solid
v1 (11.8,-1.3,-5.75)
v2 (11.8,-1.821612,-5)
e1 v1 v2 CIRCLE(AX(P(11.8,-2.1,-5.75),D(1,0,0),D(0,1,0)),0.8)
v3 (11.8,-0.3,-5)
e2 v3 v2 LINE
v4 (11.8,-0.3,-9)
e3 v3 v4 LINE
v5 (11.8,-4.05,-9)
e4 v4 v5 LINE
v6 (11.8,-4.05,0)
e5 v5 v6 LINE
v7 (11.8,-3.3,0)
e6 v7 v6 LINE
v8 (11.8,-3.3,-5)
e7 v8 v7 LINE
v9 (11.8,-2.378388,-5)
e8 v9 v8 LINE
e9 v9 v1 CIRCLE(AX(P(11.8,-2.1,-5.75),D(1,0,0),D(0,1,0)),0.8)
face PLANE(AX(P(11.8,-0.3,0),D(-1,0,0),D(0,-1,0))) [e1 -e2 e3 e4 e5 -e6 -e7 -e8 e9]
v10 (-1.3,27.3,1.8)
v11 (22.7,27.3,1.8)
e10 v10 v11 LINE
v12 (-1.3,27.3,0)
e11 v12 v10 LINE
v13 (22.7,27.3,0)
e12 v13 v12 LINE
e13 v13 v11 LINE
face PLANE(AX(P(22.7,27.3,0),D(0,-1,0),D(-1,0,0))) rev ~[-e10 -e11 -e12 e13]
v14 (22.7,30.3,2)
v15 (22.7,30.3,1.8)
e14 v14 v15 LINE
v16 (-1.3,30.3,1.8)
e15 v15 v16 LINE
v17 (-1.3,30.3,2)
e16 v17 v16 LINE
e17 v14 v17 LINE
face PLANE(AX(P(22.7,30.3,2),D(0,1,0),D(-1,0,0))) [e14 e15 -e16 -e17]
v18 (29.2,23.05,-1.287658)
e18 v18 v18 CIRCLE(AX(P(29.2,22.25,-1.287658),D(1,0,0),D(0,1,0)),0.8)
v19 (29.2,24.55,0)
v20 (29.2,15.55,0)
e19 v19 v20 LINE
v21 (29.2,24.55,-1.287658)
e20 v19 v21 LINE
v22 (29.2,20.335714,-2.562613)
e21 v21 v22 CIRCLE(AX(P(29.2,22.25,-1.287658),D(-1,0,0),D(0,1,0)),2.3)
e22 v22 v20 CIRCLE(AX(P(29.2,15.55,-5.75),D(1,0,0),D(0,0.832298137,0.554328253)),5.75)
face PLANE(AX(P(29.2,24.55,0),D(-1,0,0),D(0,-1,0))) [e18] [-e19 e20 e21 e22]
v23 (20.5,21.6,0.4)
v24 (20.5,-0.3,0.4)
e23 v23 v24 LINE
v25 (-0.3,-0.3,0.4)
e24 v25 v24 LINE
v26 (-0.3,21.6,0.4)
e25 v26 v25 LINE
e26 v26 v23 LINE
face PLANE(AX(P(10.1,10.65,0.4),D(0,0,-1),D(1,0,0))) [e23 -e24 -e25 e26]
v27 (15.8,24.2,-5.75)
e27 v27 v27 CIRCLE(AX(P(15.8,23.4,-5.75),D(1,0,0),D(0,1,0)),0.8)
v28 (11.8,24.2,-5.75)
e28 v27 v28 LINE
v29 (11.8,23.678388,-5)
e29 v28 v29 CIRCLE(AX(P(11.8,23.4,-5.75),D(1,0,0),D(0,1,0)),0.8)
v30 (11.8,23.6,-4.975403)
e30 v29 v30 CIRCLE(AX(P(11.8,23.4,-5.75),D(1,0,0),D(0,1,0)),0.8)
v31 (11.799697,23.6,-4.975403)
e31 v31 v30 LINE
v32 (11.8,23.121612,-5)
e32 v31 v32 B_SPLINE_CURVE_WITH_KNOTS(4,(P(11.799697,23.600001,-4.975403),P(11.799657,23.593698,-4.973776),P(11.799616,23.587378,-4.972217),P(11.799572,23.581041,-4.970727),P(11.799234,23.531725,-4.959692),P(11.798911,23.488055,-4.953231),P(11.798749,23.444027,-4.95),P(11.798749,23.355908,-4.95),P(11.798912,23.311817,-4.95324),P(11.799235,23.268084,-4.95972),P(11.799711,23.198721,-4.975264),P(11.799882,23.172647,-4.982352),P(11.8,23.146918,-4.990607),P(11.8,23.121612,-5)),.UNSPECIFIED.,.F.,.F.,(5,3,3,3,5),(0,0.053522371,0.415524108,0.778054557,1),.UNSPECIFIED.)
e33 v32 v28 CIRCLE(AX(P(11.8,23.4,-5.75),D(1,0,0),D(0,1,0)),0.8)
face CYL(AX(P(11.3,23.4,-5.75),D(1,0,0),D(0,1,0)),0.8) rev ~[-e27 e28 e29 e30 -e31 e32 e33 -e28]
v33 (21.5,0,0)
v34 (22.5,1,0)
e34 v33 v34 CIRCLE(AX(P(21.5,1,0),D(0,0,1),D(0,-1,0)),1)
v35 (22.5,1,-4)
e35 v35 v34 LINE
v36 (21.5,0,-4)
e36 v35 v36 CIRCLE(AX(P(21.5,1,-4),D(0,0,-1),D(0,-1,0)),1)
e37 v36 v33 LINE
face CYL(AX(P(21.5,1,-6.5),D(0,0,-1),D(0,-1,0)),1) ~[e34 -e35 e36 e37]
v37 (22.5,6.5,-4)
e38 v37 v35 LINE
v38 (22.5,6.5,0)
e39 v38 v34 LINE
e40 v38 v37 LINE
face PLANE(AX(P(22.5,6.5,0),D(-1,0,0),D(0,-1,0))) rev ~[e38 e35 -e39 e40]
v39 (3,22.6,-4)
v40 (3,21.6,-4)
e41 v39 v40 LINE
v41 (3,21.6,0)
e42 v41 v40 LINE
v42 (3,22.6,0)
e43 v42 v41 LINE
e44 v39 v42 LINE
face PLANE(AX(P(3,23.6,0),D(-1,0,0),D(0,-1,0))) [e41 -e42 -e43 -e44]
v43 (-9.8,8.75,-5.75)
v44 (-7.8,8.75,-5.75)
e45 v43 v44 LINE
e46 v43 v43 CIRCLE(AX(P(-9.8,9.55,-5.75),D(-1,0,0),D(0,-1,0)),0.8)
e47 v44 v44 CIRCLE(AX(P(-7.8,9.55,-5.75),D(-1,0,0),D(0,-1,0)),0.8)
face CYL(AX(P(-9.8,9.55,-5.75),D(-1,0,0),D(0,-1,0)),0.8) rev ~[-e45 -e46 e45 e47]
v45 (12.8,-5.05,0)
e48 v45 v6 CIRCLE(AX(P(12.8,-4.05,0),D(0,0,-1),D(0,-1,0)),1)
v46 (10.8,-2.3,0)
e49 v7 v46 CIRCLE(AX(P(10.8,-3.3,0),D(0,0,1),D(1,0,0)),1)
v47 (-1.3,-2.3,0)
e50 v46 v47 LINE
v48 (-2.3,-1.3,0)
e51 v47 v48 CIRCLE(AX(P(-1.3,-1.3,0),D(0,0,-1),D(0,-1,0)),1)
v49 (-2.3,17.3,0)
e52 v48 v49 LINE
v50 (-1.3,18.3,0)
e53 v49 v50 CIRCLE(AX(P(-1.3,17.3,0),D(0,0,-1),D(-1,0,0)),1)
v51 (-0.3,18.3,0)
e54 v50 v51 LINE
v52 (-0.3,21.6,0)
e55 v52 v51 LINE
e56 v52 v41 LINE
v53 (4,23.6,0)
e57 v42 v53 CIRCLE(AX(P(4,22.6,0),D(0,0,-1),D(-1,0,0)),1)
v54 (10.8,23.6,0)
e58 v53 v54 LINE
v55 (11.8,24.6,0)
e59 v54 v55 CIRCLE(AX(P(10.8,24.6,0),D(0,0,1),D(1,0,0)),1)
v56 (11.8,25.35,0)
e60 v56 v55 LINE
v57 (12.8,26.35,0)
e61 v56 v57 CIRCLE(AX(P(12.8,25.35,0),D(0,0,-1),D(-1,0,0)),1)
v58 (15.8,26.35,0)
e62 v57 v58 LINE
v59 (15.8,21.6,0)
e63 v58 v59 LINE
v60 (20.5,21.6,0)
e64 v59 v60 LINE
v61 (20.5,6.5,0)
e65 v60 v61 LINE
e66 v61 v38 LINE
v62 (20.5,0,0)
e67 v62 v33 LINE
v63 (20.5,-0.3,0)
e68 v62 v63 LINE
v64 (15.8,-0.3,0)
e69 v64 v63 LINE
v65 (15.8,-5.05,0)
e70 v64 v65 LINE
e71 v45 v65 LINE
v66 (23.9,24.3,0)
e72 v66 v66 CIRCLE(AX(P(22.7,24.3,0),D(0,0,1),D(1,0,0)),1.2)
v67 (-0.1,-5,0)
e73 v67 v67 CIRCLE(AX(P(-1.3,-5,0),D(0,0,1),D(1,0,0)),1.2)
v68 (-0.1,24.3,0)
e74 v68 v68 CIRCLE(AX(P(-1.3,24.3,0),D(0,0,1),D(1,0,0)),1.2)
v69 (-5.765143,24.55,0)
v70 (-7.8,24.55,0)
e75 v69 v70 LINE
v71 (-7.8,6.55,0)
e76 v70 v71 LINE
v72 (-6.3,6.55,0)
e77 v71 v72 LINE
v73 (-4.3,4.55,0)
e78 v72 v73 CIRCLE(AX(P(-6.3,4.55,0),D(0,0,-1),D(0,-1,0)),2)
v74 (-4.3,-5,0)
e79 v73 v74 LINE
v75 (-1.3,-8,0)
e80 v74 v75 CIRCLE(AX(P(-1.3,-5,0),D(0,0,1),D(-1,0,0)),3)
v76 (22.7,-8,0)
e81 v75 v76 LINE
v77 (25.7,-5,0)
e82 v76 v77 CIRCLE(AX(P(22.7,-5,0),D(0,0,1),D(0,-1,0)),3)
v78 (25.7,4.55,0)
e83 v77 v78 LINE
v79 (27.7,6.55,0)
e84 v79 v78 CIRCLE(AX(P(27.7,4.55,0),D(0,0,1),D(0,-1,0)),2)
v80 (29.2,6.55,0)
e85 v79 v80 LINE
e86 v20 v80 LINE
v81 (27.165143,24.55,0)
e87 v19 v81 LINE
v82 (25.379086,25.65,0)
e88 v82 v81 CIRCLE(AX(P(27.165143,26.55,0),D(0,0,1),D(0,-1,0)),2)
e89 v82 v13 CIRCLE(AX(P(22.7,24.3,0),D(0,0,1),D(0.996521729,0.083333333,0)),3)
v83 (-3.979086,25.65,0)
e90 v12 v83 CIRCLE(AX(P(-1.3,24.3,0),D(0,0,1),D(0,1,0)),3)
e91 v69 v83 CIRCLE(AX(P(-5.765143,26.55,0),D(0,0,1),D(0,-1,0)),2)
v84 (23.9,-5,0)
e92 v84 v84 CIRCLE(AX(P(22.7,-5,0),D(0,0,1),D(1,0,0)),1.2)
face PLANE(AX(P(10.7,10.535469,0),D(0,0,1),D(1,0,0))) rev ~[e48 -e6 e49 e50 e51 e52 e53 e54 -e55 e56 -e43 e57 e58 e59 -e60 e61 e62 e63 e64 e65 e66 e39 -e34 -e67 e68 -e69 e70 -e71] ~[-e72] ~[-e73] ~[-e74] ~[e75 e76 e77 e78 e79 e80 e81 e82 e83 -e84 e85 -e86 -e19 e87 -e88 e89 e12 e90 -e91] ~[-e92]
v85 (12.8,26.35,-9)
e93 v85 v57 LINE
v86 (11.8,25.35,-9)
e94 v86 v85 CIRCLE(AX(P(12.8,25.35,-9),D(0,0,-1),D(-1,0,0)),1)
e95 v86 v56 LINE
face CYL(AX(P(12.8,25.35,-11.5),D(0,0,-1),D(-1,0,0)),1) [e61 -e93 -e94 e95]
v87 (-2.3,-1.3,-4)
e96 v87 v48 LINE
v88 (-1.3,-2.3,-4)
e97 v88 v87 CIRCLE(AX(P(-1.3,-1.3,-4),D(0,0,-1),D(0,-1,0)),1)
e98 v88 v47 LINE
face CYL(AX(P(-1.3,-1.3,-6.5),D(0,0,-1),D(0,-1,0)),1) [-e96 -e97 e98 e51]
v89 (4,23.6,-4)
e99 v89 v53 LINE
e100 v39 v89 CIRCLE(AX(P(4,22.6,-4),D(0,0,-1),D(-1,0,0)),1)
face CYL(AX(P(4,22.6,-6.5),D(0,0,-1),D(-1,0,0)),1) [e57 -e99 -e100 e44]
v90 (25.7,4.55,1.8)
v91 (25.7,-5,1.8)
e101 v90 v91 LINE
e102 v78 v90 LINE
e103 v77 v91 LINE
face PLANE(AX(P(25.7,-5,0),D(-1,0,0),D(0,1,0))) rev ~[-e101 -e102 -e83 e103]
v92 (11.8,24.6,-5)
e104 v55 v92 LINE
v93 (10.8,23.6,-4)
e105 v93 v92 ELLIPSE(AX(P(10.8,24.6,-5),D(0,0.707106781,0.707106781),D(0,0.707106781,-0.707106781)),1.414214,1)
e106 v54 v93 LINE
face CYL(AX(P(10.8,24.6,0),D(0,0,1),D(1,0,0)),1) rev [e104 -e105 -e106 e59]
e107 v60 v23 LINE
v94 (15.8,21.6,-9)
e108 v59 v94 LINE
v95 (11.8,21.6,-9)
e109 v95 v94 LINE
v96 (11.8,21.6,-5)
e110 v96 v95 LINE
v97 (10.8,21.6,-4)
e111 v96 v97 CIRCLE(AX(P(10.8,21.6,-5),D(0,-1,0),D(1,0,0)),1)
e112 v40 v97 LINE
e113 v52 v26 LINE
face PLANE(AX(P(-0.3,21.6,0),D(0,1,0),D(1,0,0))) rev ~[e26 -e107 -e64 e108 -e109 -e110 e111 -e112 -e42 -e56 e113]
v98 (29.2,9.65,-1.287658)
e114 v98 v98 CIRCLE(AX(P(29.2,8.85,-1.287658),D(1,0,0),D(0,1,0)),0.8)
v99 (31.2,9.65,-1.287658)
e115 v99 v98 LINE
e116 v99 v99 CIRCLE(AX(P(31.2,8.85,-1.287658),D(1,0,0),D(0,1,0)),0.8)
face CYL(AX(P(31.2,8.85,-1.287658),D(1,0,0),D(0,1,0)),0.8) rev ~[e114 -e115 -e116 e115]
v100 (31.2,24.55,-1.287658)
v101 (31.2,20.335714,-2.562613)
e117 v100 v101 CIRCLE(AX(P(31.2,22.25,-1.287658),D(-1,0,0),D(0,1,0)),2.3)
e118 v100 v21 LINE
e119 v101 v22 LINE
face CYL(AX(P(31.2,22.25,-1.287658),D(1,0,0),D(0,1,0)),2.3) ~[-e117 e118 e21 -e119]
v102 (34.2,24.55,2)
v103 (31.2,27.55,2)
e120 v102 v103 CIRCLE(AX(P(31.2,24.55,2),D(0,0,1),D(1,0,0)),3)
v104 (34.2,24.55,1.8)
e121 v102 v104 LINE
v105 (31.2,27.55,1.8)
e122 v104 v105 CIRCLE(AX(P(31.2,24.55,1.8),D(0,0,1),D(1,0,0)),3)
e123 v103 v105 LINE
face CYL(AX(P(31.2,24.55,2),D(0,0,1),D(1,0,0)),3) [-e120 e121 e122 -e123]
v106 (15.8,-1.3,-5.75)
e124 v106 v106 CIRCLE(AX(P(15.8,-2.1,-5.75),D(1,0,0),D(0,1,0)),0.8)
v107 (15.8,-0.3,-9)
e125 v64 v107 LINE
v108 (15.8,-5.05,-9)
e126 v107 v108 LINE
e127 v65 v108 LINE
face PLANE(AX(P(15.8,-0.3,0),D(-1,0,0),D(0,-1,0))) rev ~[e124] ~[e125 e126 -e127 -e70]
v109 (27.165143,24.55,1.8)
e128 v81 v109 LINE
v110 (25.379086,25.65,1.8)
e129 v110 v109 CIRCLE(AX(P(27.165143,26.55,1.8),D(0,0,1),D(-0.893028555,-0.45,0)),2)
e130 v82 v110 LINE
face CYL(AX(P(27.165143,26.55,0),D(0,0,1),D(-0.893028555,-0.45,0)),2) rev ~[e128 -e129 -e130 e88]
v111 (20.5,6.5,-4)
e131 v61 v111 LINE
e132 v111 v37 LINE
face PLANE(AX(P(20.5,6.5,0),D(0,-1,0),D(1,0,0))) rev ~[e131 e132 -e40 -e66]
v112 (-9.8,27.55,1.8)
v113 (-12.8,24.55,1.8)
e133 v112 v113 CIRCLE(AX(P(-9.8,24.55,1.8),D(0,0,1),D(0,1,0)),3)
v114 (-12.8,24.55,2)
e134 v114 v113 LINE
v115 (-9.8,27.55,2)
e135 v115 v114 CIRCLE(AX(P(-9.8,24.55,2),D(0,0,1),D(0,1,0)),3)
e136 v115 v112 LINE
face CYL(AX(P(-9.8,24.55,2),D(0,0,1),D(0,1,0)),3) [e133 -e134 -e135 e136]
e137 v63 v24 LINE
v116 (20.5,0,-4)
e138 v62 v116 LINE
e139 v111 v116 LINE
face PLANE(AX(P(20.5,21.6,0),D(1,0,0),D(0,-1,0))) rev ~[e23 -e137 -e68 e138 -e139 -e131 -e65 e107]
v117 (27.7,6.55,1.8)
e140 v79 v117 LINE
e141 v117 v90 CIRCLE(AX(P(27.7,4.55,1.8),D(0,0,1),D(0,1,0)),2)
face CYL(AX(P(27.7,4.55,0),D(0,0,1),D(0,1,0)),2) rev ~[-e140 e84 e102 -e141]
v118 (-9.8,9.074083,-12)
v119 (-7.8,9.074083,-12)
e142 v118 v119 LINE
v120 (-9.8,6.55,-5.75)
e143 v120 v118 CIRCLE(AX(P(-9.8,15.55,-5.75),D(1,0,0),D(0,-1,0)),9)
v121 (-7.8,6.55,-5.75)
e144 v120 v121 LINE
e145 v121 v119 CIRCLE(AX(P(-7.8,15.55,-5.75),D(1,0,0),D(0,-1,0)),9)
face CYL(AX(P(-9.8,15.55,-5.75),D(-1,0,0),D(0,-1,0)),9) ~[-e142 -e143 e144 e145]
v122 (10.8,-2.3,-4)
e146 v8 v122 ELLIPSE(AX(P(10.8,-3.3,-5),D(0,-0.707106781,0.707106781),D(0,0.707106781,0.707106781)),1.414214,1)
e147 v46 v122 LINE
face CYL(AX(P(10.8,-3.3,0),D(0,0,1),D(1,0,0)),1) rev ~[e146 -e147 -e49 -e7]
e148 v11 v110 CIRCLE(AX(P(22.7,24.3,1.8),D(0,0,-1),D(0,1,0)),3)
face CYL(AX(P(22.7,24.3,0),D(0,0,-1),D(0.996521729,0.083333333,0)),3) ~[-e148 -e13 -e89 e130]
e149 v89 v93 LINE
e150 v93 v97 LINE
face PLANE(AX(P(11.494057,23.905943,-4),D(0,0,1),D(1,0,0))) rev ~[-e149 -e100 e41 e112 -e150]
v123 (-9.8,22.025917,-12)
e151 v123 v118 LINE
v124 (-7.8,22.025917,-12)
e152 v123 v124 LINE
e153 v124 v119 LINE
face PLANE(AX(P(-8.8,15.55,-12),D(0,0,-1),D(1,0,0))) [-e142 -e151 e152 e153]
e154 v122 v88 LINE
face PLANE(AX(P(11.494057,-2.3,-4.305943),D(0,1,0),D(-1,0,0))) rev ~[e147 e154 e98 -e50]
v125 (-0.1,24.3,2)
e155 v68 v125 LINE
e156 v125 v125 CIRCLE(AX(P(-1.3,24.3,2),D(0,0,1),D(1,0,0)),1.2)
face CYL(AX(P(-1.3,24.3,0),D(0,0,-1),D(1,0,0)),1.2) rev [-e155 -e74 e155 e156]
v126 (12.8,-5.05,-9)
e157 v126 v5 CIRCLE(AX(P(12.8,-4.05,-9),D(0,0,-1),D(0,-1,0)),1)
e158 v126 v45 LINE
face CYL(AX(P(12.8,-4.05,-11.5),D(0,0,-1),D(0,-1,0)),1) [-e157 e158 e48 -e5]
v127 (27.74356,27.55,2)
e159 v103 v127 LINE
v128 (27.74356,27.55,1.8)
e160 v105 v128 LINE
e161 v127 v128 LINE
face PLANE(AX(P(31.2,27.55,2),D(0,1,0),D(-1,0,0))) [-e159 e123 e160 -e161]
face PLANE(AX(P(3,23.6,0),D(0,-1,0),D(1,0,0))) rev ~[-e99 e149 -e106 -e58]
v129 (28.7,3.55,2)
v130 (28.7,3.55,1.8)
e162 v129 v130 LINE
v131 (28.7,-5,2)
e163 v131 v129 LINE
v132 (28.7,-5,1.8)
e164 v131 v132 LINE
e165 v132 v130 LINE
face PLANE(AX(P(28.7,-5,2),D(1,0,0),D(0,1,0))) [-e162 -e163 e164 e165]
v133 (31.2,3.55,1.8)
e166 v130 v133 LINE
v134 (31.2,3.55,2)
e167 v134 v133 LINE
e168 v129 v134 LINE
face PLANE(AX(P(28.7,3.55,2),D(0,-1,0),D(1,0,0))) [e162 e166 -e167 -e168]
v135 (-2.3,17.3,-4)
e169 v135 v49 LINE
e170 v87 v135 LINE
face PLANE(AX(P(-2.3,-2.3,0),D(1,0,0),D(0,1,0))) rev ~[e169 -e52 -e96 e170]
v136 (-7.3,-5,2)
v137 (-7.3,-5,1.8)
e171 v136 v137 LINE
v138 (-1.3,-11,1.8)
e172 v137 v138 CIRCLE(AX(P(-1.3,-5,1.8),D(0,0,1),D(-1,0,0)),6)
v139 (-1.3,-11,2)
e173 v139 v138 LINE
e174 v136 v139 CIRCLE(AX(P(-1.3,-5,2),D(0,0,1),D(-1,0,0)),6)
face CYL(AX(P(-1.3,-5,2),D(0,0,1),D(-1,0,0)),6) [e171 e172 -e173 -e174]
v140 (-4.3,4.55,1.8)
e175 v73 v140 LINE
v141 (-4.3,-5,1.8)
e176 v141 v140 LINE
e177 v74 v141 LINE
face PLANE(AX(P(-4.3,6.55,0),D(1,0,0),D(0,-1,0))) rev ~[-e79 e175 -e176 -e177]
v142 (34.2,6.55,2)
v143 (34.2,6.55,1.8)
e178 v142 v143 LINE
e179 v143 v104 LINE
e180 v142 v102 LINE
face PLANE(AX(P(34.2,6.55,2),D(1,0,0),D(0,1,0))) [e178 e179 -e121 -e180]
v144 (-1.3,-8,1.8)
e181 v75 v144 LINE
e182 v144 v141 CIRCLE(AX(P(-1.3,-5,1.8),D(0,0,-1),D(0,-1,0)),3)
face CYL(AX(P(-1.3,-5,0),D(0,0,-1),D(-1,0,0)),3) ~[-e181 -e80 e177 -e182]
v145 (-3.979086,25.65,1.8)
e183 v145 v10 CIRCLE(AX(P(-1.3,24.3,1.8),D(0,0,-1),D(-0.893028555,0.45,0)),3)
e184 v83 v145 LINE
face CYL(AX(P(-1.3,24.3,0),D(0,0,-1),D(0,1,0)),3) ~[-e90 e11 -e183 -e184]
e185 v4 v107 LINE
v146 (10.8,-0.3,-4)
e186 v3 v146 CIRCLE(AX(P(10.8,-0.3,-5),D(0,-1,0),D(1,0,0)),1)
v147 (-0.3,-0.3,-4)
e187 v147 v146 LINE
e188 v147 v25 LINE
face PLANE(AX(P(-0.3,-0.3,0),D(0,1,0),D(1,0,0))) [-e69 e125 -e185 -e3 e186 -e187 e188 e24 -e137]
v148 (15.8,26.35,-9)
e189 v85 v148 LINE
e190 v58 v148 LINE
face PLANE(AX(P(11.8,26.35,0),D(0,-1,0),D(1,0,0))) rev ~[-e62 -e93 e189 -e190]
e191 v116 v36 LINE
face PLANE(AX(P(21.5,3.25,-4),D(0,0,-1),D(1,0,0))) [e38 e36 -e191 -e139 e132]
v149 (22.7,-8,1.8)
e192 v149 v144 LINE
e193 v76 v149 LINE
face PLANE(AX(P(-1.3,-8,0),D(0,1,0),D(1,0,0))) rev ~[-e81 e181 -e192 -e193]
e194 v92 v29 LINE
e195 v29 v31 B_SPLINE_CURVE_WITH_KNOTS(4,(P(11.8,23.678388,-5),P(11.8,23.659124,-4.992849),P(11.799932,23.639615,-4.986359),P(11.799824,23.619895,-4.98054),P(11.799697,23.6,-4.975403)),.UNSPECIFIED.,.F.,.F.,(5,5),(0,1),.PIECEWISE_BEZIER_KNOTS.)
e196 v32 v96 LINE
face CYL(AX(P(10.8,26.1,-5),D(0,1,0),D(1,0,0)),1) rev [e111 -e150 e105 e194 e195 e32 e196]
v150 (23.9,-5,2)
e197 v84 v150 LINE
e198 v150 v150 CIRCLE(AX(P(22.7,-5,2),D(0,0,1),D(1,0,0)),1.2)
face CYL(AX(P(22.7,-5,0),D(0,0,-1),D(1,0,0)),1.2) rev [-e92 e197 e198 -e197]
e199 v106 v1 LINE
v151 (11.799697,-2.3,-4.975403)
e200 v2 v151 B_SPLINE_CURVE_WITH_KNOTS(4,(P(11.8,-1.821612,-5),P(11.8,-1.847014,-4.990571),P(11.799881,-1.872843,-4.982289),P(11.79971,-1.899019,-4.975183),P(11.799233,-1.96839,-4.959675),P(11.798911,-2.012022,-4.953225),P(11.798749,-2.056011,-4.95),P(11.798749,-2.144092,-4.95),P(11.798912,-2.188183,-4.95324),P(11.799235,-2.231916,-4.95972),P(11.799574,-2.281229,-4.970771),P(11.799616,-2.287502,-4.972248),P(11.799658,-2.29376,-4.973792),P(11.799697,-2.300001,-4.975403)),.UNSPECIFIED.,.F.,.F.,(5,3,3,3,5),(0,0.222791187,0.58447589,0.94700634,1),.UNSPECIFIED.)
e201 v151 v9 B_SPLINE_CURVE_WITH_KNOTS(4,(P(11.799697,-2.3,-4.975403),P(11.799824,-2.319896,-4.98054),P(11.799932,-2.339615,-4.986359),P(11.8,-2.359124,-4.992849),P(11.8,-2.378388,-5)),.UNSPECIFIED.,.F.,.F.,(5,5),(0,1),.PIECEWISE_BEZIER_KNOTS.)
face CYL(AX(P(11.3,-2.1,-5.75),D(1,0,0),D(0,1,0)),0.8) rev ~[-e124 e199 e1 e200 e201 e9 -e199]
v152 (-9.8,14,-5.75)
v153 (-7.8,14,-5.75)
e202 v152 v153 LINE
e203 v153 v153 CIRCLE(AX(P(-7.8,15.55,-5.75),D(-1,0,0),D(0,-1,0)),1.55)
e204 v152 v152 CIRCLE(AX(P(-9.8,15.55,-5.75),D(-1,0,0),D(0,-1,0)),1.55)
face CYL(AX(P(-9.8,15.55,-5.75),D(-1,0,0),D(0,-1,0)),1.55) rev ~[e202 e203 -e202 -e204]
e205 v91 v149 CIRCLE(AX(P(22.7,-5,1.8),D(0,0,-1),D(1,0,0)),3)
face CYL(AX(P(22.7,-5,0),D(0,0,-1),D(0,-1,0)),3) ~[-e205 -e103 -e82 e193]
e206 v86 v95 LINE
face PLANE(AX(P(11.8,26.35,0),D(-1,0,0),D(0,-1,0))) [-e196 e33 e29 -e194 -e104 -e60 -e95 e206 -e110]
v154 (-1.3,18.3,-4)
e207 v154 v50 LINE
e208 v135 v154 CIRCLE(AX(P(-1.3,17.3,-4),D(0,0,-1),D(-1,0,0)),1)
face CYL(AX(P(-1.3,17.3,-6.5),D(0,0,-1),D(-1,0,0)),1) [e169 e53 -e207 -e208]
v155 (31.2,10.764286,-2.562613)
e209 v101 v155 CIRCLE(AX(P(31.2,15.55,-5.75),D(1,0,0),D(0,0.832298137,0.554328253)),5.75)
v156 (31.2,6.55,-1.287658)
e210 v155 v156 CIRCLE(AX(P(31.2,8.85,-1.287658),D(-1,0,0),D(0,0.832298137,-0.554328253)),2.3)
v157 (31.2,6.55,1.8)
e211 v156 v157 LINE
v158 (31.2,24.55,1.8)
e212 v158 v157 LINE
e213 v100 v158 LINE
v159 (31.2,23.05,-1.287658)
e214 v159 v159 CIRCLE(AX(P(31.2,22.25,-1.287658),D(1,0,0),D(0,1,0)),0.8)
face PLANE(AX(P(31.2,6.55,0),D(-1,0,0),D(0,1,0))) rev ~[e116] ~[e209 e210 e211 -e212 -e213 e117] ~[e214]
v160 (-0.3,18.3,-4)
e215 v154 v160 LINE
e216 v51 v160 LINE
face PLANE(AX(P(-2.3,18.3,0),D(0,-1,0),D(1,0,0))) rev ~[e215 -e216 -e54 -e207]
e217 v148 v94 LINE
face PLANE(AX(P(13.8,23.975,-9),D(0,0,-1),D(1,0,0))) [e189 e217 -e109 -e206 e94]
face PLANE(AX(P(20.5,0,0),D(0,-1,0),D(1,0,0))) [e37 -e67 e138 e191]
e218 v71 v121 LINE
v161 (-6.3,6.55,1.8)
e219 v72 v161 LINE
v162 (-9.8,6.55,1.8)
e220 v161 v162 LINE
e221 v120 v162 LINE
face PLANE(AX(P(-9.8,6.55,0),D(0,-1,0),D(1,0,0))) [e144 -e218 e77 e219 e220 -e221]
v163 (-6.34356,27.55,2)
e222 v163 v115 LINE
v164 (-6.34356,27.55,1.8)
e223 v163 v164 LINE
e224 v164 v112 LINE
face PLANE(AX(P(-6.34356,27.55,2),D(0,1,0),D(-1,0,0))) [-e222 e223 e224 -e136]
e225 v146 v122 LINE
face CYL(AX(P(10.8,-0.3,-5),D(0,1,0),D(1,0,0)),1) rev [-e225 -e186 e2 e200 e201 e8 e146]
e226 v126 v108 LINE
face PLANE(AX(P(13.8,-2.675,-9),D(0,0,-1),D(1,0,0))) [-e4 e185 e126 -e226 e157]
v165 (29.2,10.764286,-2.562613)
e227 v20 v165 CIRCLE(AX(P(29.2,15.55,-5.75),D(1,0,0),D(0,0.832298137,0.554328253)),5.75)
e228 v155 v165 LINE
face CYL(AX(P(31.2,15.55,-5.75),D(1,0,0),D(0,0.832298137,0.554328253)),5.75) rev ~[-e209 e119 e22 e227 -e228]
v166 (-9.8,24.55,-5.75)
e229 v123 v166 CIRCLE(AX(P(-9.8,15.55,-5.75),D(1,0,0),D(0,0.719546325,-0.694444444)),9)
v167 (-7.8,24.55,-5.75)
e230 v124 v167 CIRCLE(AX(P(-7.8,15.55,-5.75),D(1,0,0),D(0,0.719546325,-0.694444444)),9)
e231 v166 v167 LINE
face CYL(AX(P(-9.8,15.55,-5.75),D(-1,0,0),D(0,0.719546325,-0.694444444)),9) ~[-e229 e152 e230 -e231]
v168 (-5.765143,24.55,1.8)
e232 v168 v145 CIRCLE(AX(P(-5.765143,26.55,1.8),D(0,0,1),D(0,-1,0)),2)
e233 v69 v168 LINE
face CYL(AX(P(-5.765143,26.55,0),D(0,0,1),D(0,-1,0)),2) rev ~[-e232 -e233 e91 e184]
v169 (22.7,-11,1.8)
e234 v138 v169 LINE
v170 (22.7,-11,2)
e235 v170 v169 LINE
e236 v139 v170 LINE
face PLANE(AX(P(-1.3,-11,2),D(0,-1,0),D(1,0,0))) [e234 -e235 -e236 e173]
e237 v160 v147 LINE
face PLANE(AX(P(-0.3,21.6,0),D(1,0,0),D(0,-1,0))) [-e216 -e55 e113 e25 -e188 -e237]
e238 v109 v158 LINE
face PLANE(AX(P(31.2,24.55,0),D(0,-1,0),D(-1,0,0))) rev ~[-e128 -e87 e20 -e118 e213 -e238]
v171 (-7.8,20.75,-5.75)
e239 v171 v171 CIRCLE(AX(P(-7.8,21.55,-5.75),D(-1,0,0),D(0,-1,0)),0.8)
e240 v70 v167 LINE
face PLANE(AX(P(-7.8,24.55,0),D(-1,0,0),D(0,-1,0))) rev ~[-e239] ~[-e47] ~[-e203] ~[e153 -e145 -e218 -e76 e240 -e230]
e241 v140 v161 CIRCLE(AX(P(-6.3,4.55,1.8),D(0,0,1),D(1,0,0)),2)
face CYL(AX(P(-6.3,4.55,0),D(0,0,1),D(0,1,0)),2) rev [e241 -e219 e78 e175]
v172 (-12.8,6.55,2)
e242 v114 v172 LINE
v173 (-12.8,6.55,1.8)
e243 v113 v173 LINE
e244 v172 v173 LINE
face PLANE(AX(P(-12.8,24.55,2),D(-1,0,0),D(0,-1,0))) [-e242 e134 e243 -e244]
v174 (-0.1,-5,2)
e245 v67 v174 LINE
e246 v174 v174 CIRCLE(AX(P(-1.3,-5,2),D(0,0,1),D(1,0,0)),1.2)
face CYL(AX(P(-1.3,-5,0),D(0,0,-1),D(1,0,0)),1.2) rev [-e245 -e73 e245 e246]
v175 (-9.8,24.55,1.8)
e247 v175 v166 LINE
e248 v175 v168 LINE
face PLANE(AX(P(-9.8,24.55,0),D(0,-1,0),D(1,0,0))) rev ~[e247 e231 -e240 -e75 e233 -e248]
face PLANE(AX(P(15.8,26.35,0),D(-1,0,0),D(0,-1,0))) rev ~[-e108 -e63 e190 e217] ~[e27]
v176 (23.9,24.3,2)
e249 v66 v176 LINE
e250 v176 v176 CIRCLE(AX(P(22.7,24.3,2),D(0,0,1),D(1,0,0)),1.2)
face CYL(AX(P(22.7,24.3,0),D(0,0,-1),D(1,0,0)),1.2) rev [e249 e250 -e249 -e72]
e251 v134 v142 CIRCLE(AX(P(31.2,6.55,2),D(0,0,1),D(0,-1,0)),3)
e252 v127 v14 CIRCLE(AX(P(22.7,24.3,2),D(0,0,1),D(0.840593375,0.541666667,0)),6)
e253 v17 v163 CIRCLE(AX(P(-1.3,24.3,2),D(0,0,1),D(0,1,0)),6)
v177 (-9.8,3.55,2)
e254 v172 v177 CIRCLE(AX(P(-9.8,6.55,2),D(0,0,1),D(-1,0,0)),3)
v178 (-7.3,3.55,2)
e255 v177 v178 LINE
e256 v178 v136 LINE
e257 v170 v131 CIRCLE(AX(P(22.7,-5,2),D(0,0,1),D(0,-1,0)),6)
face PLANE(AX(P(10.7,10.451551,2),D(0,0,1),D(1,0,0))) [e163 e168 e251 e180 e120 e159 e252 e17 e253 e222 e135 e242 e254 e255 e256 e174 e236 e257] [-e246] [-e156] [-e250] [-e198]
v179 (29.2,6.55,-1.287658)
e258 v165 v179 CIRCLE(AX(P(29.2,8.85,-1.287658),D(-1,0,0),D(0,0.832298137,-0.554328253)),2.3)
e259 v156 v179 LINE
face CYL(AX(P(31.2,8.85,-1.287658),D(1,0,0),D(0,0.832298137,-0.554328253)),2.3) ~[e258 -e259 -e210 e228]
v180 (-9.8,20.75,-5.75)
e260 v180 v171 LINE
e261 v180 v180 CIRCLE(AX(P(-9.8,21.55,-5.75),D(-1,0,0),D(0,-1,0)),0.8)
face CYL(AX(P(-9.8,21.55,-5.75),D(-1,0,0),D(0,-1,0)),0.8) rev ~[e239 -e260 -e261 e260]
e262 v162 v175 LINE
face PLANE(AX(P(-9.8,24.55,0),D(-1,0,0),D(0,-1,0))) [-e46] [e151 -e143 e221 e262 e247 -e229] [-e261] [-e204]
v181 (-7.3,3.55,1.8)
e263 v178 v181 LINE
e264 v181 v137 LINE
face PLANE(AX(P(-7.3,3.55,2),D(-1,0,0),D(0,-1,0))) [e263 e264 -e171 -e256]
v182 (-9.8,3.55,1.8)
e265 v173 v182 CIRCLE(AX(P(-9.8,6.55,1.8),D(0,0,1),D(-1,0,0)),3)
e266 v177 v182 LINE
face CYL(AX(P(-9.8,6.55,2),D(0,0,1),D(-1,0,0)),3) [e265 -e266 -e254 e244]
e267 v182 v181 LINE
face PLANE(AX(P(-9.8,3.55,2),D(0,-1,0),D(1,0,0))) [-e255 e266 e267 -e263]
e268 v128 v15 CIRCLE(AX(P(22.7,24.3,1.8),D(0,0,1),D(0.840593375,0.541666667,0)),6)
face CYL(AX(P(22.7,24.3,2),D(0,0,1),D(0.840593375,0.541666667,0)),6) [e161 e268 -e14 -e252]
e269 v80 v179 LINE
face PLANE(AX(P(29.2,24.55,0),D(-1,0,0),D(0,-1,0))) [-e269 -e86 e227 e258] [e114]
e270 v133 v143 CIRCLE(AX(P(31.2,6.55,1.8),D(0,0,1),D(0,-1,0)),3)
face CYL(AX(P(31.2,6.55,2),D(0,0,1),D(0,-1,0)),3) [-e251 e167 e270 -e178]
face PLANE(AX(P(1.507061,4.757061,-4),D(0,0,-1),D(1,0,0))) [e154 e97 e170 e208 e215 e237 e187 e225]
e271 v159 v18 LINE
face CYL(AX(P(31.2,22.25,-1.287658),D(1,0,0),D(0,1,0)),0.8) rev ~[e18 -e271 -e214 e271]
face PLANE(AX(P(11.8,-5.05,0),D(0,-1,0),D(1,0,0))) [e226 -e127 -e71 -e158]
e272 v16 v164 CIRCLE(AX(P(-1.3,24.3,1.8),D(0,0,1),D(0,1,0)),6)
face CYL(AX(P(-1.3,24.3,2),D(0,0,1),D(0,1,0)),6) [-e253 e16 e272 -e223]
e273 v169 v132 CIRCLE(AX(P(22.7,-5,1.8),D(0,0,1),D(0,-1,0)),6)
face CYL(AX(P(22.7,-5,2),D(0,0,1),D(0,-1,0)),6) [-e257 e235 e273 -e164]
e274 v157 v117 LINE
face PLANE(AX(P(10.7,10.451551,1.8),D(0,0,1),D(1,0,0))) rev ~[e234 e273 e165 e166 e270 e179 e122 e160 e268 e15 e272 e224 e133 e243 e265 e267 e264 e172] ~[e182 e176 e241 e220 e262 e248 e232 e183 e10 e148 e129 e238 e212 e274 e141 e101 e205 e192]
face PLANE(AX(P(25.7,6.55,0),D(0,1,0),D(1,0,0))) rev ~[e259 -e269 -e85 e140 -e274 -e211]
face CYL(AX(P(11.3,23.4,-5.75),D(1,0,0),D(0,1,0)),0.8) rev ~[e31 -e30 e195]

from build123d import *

# Parameters (mm, degrees)
F1_R          = 1.2
F2_DEPTH      = 2
F3_R          = 2
F4_W          = 4
F4_H          = 4.75
F5_DEPTH      = 9
F6_W          = 8.8
F6_H          = 2
F6_W_2        = 2
F6_H_2        = 6.5
F7_DEPTH      = 4
F8_R          = 0.8
F9_DEPTH      = 4
F10_T4_DEPTH  = 2
F10_S5_R      = 0.8
F10_T6_DEPTH  = 3
F10_T10_DEPTH = 6.5
F10_T15_DEPTH = 6.5
F10_T20_DEPTH = 2
F10_S21_R     = 0.8
F10_T22_DEPTH = 3
F10_T27_DEPTH = 6.5
F10_S29_R     = 0.8
F10_T30_DEPTH = 5
F10_T33_DEPTH = 4.5
F10_T40_DEPTH = 4.5
F10_T44_DEPTH = 6.5
F10_S46_R     = 0.8
F10_T47_DEPTH = 5
F10_T49_DEPTH = 6.5
F10_T51_DEPTH = 11.5
F11_W         = 2
F11_H         = 18
F12_DEPTH     = 12
F13_R         = 1.55
F13_R_2       = 0.8
F14_DEPTH     = 2
F15_R         = 0.8
F16_DEPTH     = 2
F19_DEPTH     = 0.2
F20_W         = 20.8
F20_H         = 21.9
F21_DEPTH     = 0.4


# Not quite as in the source:
# - a fillet or chamfer that OpenCascade refuses, or shapes differently, is made with other operations: its cross-section is extruded or revolved along the edge and cut away or added
# - two fillets or chamfers of one size are made in one step


with BuildPart() as f2:
    # F1 (on Top) → F2 (new body)
    with BuildSketch(Plane.XY):
        with BuildLine():
            Line((-4.2895651858, 24.55), (-9.8, 24.55))
            Line((-9.8, 24.55), (-9.8, 6.55))
            Line((-9.8, 6.55), (-4.3, 6.55))
            Line((-4.3, 6.55), (-4.3, -5))
            ThreePointArc((-4.3, -5), (-3.4213203436, -7.1213203436), (-1.3, -8))
            Line((-1.3, -8), (22.7, -8))
            ThreePointArc((22.7, -8), (24.8213203436, -7.1213203436), (25.7, -5))
            Line((25.7, -5), (25.7, 6.55))
            Line((25.7, 6.55), (31.2, 6.55))
            Line((31.2, 6.55), (31.2, 24.55))
            Line((31.2, 24.55), (25.6895651858, 24.55))
            ThreePointArc((25.6895651858, 24.55), (24.7310096012, 26.5079402166), (22.7, 27.3))
            Line((22.7, 27.3), (-1.3, 27.3))
            ThreePointArc((-1.3, 27.3), (-3.3310096012, 26.5079402166), (-4.2895651858, 24.55))
        make_face()
        with Locations((-1.3, -5)):
            Circle(F1_R, mode=Mode.SUBTRACT)
        with Locations((22.7, -5)):
            Circle(F1_R, mode=Mode.SUBTRACT)
        with Locations((-1.3, 24.3)):
            Circle(F1_R, mode=Mode.SUBTRACT)
        with Locations((22.7, 24.3)):
            Circle(F1_R, mode=Mode.SUBTRACT)
    extrude(amount=F2_DEPTH)

    # F3
    f3_edges = [f2.edges().sort_by_distance(p)[0] for p in [
        (-4.289565, 24.55, 1),
        (-4.3, 6.55, 1),
        (25.7, 6.55, 1),
        (25.689565, 24.55, 1),
    ]]
    fillet(f3_edges, radius=F3_R)

    # F4 (on face) → F5 (join)
    with BuildSketch(Plane(origin=(0, 0, 0), x_dir=(1, 0, 0), z_dir=(0, 0, -1))):
        with Locations((13.8, 2.675)):
            Rectangle(F4_W, F4_H)
        with Locations((13.8, -23.975)):
            Rectangle(F4_W, F4_H)
    extrude(amount=F5_DEPTH)

    # F6 (on face) → F7 (join)
    with BuildSketch(Plane(origin=(0, 0, 0), x_dir=(1, 0, 0), z_dir=(0, 0, -1))):
        Polygon((-2.3, -18.3), (-0.3, -18.3), (-0.3, 0.3), (11.8, 0.3), (11.8, 2.3), (-2.3, 2.3), align=None)
        with Locations((7.4, -22.6)):
            Rectangle(F6_W, F6_H)
        with Locations((21.5, -3.25)):
            Rectangle(F6_W_2, F6_H_2)
    extrude(amount=F7_DEPTH)

    # F8 (on face) → F9 (cut, through all)
    with BuildSketch(Plane.YZ.offset(15.8)):
        with Locations((23.4, -5.75)):
            Circle(F8_R)
        with Locations((-2.1, -5.75)):
            Circle(F8_R)
    extrude(amount=-F9_DEPTH, mode=Mode.SUBTRACT)

    # F10: fillet of radius 1 on 10 edges, made by hand


with BuildPart() as f10_tool2:
    # F10_s3 → F10_t4 (new body)
    with BuildSketch(Plane.XZ.offset(0.3)):
        with BuildLine():
            ThreePointArc((11.8, -5), (11.5071067812, -4.2928932188), (10.8, -4))
            Line((10.8, -4), (11.8, -4))
            Line((11.8, -4), (11.8, -5))
        make_face()
    extrude(amount=F10_T4_DEPTH)

    # F10_s5 → F10_t6 (cut, symmetric)
    with BuildSketch(Plane.YZ.offset(11.3)):
        with Locations((-2.1, -5.75)):
            Circle(F10_S5_R)
    extrude(amount=F10_T6_DEPTH, both=True, mode=Mode.SUBTRACT)


with BuildPart() as f2_1:
    add(f2.part)

    # F10_t1: union F10_tool2
    add(f10_tool2.part)


with BuildPart() as f10_tool8:
    # F10_s9 → F10_t10 (new body)
    with BuildSketch(Plane.XY.offset(2.5)):
        with BuildLine():
            ThreePointArc((11.8, -3.3), (11.5071067812, -2.5928932188), (10.8, -2.3))
            Line((10.8, -2.3), (11.8, -2.3))
            Line((11.8, -2.3), (11.8, -3.3))
        make_face()
    extrude(amount=-F10_T10_DEPTH)

    split(bisect_by=Plane.XY.offset(2), keep=Keep.BOTTOM)


with BuildPart() as f2_2:
    add(f2_1.part)

    # F10_t7: union F10_tool8
    add(f10_tool8.part)


with BuildPart() as f10_tool13:
    # F10_s14 → F10_t15 (new body)
    with BuildSketch(Plane.XY.offset(2.5)):
        with BuildLine():
            ThreePointArc((11.8, 24.6), (11.5071067812, 23.8928932188), (10.8, 23.6))
            Line((10.8, 23.6), (11.8, 23.6))
            Line((11.8, 23.6), (11.8, 24.6))
        make_face()
    extrude(amount=-F10_T15_DEPTH)

    split(bisect_by=Plane.XY.offset(2), keep=Keep.BOTTOM)


with BuildPart() as f2_3:
    add(f2_2.part)

    # F10_t12: union F10_tool13
    add(f10_tool13.part)


with BuildPart() as f10_tool18:
    # F10_s19 → F10_t20 (new body)
    with BuildSketch(Plane.XZ.offset(-23.6)):
        with BuildLine():
            ThreePointArc((11.8, -5), (11.5071067812, -4.2928932188), (10.8, -4))
            Line((10.8, -4), (11.8, -4))
            Line((11.8, -4), (11.8, -5))
        make_face()
    extrude(amount=F10_T20_DEPTH)

    # F10_s21 → F10_t22 (cut, symmetric)
    with BuildSketch(Plane.YZ.offset(11.3)):
        with Locations((23.4, -5.75)):
            Circle(F10_S21_R)
    extrude(amount=F10_T22_DEPTH, both=True, mode=Mode.SUBTRACT)


with BuildPart() as f2_4:
    add(f2_3.part)

    # F10_t17: union F10_tool18
    add(f10_tool18.part)


with BuildPart() as f10_tool25:
    # F10_s26 → F10_t27 (new body)
    with BuildSketch(Plane.XY):
        with BuildLine():
            ThreePointArc((11.8, -3.3), (11.5071067812, -2.5928932188), (10.8, -2.3))
            Line((10.8, -2.3), (11.8, -2.3))
            Line((11.8, -2.3), (11.8, -3.3))
        make_face()
    extrude(amount=-F10_T27_DEPTH)

    split(bisect_by=Plane.XY.offset(-4), keep=Keep.BOTTOM)

    # F10_s29 → F10_t30 (cut, symmetric)
    with BuildSketch(Plane.YZ.offset(11.3)):
        with Locations((-2.1, -5.75)):
            Circle(F10_S29_R)
    extrude(amount=F10_T30_DEPTH, both=True, mode=Mode.SUBTRACT)


with BuildPart() as f10_tool31:
    # F10_s32 → F10_t33 (new body)
    with BuildSketch(Plane.XZ.offset(0.3)):
        with BuildLine():
            ThreePointArc((11.8, -5), (11.5071067812, -4.2928932188), (10.8, -4))
            Line((10.8, -4), (11.8, -4))
            Line((11.8, -4), (11.8, -5))
        make_face()
    extrude(amount=F10_T33_DEPTH)

    split(bisect_by=Plane.XZ.offset(2.3), keep=Keep.TOP)


with BuildPart() as f10_tool25_1:
    add(f10_tool25.part)

    # F10_t35: intersect F10_tool31
    add(f10_tool31.part, mode=Mode.INTERSECT)


with BuildPart() as f2_5:
    add(f2_4.part)

    # F10_t23: union F10_tool25
    add(f10_tool25_1.part)


with BuildPart() as f10_tool38:
    # F10_s39 → F10_t40 (new body)
    with BuildSketch(Plane.XZ.offset(-26.1)):
        with BuildLine():
            ThreePointArc((11.8, -5), (11.5071067812, -4.2928932188), (10.8, -4))
            Line((10.8, -4), (11.8, -4))
            Line((11.8, -4), (11.8, -5))
        make_face()
    extrude(amount=F10_T40_DEPTH)

    split(bisect_by=Plane.XZ.offset(-23.6), keep=Keep.BOTTOM)


with BuildPart() as f10_tool42:
    # F10_s43 → F10_t44 (new body)
    with BuildSketch(Plane.XY):
        with BuildLine():
            ThreePointArc((11.8, 24.6), (11.5071067812, 23.8928932188), (10.8, 23.6))
            Line((10.8, 23.6), (11.8, 23.6))
            Line((11.8, 23.6), (11.8, 24.6))
        make_face()
    extrude(amount=-F10_T44_DEPTH)

    split(bisect_by=Plane.XY.offset(-4), keep=Keep.BOTTOM)

    # F10_s46 → F10_t47 (cut, symmetric)
    with BuildSketch(Plane.YZ.offset(11.3)):
        with Locations((23.4, -5.75)):
            Circle(F10_S46_R)
    extrude(amount=F10_T47_DEPTH, both=True, mode=Mode.SUBTRACT)


with BuildPart() as f10_tool38_1:
    add(f10_tool38.part)

    # F10_t48: intersect F10_tool42
    add(f10_tool42.part, mode=Mode.INTERSECT)


with BuildPart() as f2_6:
    add(f2_5.part)

    # F10_t36: union F10_tool38
    add(f10_tool38_1.part)

    # F10_s50 → F10_t49 (cut)
    with BuildSketch(Plane.XY.offset(-6.5)):
        with BuildLine():
            ThreePointArc((-1.3, -2.3), (-2.0071067812, -2.0071067812), (-2.3, -1.3))
            Line((-2.3, -1.3), (-2.3, -2.3))
            Line((-2.3, -2.3), (-1.3, -2.3))
        make_face()
        with BuildLine():
            ThreePointArc((-2.3, 17.3), (-2.0071067812, 18.0071067812), (-1.3, 18.3))
            Line((-1.3, 18.3), (-2.3, 18.3))
            Line((-2.3, 18.3), (-2.3, 17.3))
        make_face()
        with BuildLine():
            ThreePointArc((3, 22.6), (3.2928932188, 23.3071067812), (4, 23.6))
            Line((4, 23.6), (3, 23.6))
            Line((3, 23.6), (3, 22.6))
        make_face()
        with BuildLine():
            ThreePointArc((21.5, 0), (22.2071067812, 0.2928932188), (22.5, 1))
            Line((22.5, 1), (22.5, 0))
            Line((22.5, 0), (21.5, 0))
        make_face()
    extrude(amount=F10_T49_DEPTH, mode=Mode.SUBTRACT)

    # F10_s52 → F10_t51 (cut)
    with BuildSketch(Plane.XY.offset(-11.5)):
        with BuildLine():
            ThreePointArc((11.8, 25.35), (12.0928932188, 26.0571067812), (12.8, 26.35))
            Line((12.8, 26.35), (11.8, 26.35))
            Line((11.8, 26.35), (11.8, 25.35))
        make_face()
        with BuildLine():
            ThreePointArc((12.8, -5.05), (12.0928932188, -4.7571067812), (11.8, -4.05))
            Line((11.8, -4.05), (11.8, -5.05))
            Line((11.8, -5.05), (12.8, -5.05))
        make_face()
    extrude(amount=F10_T51_DEPTH, mode=Mode.SUBTRACT)

    # F11 (on face) → F12 (join)
    with BuildSketch(Plane(origin=(0, 0, 0), x_dir=(1, 0, 0), z_dir=(0, 0, -1))):
        with Locations((-8.8, -15.55)):
            Rectangle(F11_W, F11_H)
        with Locations((30.2, -15.55)):
            Rectangle(F11_W, F11_H)
    extrude(amount=F12_DEPTH)

    # F13 (on face) → F14 (cut, through all)
    with BuildSketch(Plane(origin=(-9.8, 0, 0), x_dir=(0, -1, 0), z_dir=(-1, 0, 0))):
        with Locations((-15.55, -5.75)):
            Circle(F13_R)
        with Locations((-21.55, -5.75)):
            Circle(F13_R_2)
        with Locations((-9.55, -5.75)):
            Circle(F13_R_2)
        with BuildLine():
            ThreePointArc((-22.0259169235, -12), (-23.8951558497, -9.1202186642), (-24.55, -5.75))
            Line((-24.55, -5.75), (-24.55, -12))
            Line((-24.55, -12), (-22.0259169235, -12))
        make_face()
        with BuildLine():
            ThreePointArc((-6.55, -5.75), (-7.2048441503, -9.1202186642), (-9.0740830765, -12))
            Line((-9.0740830765, -12), (-6.55, -12))
            Line((-6.55, -12), (-6.55, -5.75))
        make_face()
    extrude(amount=-F14_DEPTH, mode=Mode.SUBTRACT)

    # F15 (on face) → F16 (cut, through all)
    with BuildSketch(Plane.YZ.offset(31.2)):
        with BuildLine():
            ThreePointArc((24.55, -1.2876575658), (22.9160115829, -3.4891181199), (20.3357142857, -2.562612547))
            ThreePointArc((20.3357142857, -2.562612547), (15.55, 0), (10.7642857143, -2.562612547))
            ThreePointArc((10.7642857143, -2.562612547), (8.1839884171, -3.4891181199), (6.55, -1.2876575658))
            Line((6.55, -1.2876575658), (6.55, -12))
            Line((6.55, -12), (24.55, -12))
            Line((24.55, -12), (24.55, -1.2876575658))
        make_face()
        with Locations((8.85, -1.2876575658)):
            Circle(F15_R)
        with Locations((22.25, -1.2876575658)):
            Circle(F15_R)
    extrude(amount=-F16_DEPTH, mode=Mode.SUBTRACT)

    # F18 (on face) → F19 (join)
    with BuildSketch(Plane.XY.offset(2)):
        with BuildLine():
            ThreePointArc((-9.8, 27.55), (-11.9213203436, 26.6713203436), (-12.8, 24.55))
            Line((-12.8, 24.55), (-12.8, 6.55))
            ThreePointArc((-12.8, 6.55), (-11.9213203436, 4.4286796564), (-9.8, 3.55))
            Line((-9.8, 3.55), (-7.3, 3.55))
            Line((-7.3, 3.55), (-7.3, -5))
            ThreePointArc((-7.3, -5), (-5.5426406871, -9.2426406871), (-1.3, -11))
            Line((-1.3, -11), (22.7, -11))
            ThreePointArc((22.7, -11), (26.9426406871, -9.2426406871), (28.7, -5))
            Line((28.7, -5), (28.7, 3.55))
            Line((28.7, 3.55), (31.2, 3.55))
            ThreePointArc((31.2, 3.55), (33.3213203436, 4.4286796564), (34.2, 6.55))
            Line((34.2, 6.55), (34.2, 24.55))
            ThreePointArc((34.2, 24.55), (33.3213203436, 26.6713203436), (31.2, 27.55))
            Line((31.2, 27.55), (27.7435602505, 27.55))
            ThreePointArc((27.7435602505, 27.55), (25.5722813233, 29.5678268764), (22.7, 30.3))
            Line((22.7, 30.3), (-1.3, 30.3))
            ThreePointArc((-1.3, 30.3), (-4.1722813233, 29.5678268764), (-6.3435602505, 27.55))
            Line((-6.3435602505, 27.55), (-9.8, 27.55))
        make_face()
        with BuildLine():
            Line((-9.8, 6.55), (-9.8, 24.55))
            Line((-9.8, 24.55), (-5.7651427749, 24.55))
            ThreePointArc((-5.7651427749, 24.55), (-4.7163339267, 24.8470613634), (-3.9790856649, 25.65))
            ThreePointArc((-3.9790856649, 25.65), (-2.8732132723, 26.8544079549), (-1.3, 27.3))
            Line((-1.3, 27.3), (22.7, 27.3))
            ThreePointArc((22.7, 27.3), (24.2732132723, 26.8544079549), (25.3790856649, 25.65))
            ThreePointArc((25.3790856649, 25.65), (26.1163339267, 24.8470613634), (27.1651427749, 24.55))
            Line((27.1651427749, 24.55), (31.2, 24.55))
            Line((31.2, 24.55), (31.2, 6.55))
            Line((31.2, 6.55), (27.7, 6.55))
            ThreePointArc((27.7, 6.55), (26.2857864376, 5.9642135624), (25.7, 4.55))
            Line((25.7, 4.55), (25.7, -5))
            ThreePointArc((25.7, -5), (24.8213203436, -7.1213203436), (22.7, -8))
            Line((22.7, -8), (-1.3, -8))
            ThreePointArc((-1.3, -8), (-3.4213203436, -7.1213203436), (-4.3, -5))
            Line((-4.3, -5), (-4.3, 4.55))
            ThreePointArc((-4.3, 4.55), (-4.8857864376, 5.9642135624), (-6.3, 6.55))
            Line((-6.3, 6.55), (-9.8, 6.55))
        make_face(mode=Mode.SUBTRACT)
    extrude(amount=-F19_DEPTH)

    # F20 (on face) → F21 (cut)
    with BuildSketch(Plane(origin=(0, 0, 0), x_dir=(1, 0, 0), z_dir=(0, 0, -1))):
        with Locations((10.1, -10.65)):
            Rectangle(F20_W, F20_H)
    extrude(amount=-F21_DEPTH, mode=Mode.SUBTRACT)


solid = f2_6.part
